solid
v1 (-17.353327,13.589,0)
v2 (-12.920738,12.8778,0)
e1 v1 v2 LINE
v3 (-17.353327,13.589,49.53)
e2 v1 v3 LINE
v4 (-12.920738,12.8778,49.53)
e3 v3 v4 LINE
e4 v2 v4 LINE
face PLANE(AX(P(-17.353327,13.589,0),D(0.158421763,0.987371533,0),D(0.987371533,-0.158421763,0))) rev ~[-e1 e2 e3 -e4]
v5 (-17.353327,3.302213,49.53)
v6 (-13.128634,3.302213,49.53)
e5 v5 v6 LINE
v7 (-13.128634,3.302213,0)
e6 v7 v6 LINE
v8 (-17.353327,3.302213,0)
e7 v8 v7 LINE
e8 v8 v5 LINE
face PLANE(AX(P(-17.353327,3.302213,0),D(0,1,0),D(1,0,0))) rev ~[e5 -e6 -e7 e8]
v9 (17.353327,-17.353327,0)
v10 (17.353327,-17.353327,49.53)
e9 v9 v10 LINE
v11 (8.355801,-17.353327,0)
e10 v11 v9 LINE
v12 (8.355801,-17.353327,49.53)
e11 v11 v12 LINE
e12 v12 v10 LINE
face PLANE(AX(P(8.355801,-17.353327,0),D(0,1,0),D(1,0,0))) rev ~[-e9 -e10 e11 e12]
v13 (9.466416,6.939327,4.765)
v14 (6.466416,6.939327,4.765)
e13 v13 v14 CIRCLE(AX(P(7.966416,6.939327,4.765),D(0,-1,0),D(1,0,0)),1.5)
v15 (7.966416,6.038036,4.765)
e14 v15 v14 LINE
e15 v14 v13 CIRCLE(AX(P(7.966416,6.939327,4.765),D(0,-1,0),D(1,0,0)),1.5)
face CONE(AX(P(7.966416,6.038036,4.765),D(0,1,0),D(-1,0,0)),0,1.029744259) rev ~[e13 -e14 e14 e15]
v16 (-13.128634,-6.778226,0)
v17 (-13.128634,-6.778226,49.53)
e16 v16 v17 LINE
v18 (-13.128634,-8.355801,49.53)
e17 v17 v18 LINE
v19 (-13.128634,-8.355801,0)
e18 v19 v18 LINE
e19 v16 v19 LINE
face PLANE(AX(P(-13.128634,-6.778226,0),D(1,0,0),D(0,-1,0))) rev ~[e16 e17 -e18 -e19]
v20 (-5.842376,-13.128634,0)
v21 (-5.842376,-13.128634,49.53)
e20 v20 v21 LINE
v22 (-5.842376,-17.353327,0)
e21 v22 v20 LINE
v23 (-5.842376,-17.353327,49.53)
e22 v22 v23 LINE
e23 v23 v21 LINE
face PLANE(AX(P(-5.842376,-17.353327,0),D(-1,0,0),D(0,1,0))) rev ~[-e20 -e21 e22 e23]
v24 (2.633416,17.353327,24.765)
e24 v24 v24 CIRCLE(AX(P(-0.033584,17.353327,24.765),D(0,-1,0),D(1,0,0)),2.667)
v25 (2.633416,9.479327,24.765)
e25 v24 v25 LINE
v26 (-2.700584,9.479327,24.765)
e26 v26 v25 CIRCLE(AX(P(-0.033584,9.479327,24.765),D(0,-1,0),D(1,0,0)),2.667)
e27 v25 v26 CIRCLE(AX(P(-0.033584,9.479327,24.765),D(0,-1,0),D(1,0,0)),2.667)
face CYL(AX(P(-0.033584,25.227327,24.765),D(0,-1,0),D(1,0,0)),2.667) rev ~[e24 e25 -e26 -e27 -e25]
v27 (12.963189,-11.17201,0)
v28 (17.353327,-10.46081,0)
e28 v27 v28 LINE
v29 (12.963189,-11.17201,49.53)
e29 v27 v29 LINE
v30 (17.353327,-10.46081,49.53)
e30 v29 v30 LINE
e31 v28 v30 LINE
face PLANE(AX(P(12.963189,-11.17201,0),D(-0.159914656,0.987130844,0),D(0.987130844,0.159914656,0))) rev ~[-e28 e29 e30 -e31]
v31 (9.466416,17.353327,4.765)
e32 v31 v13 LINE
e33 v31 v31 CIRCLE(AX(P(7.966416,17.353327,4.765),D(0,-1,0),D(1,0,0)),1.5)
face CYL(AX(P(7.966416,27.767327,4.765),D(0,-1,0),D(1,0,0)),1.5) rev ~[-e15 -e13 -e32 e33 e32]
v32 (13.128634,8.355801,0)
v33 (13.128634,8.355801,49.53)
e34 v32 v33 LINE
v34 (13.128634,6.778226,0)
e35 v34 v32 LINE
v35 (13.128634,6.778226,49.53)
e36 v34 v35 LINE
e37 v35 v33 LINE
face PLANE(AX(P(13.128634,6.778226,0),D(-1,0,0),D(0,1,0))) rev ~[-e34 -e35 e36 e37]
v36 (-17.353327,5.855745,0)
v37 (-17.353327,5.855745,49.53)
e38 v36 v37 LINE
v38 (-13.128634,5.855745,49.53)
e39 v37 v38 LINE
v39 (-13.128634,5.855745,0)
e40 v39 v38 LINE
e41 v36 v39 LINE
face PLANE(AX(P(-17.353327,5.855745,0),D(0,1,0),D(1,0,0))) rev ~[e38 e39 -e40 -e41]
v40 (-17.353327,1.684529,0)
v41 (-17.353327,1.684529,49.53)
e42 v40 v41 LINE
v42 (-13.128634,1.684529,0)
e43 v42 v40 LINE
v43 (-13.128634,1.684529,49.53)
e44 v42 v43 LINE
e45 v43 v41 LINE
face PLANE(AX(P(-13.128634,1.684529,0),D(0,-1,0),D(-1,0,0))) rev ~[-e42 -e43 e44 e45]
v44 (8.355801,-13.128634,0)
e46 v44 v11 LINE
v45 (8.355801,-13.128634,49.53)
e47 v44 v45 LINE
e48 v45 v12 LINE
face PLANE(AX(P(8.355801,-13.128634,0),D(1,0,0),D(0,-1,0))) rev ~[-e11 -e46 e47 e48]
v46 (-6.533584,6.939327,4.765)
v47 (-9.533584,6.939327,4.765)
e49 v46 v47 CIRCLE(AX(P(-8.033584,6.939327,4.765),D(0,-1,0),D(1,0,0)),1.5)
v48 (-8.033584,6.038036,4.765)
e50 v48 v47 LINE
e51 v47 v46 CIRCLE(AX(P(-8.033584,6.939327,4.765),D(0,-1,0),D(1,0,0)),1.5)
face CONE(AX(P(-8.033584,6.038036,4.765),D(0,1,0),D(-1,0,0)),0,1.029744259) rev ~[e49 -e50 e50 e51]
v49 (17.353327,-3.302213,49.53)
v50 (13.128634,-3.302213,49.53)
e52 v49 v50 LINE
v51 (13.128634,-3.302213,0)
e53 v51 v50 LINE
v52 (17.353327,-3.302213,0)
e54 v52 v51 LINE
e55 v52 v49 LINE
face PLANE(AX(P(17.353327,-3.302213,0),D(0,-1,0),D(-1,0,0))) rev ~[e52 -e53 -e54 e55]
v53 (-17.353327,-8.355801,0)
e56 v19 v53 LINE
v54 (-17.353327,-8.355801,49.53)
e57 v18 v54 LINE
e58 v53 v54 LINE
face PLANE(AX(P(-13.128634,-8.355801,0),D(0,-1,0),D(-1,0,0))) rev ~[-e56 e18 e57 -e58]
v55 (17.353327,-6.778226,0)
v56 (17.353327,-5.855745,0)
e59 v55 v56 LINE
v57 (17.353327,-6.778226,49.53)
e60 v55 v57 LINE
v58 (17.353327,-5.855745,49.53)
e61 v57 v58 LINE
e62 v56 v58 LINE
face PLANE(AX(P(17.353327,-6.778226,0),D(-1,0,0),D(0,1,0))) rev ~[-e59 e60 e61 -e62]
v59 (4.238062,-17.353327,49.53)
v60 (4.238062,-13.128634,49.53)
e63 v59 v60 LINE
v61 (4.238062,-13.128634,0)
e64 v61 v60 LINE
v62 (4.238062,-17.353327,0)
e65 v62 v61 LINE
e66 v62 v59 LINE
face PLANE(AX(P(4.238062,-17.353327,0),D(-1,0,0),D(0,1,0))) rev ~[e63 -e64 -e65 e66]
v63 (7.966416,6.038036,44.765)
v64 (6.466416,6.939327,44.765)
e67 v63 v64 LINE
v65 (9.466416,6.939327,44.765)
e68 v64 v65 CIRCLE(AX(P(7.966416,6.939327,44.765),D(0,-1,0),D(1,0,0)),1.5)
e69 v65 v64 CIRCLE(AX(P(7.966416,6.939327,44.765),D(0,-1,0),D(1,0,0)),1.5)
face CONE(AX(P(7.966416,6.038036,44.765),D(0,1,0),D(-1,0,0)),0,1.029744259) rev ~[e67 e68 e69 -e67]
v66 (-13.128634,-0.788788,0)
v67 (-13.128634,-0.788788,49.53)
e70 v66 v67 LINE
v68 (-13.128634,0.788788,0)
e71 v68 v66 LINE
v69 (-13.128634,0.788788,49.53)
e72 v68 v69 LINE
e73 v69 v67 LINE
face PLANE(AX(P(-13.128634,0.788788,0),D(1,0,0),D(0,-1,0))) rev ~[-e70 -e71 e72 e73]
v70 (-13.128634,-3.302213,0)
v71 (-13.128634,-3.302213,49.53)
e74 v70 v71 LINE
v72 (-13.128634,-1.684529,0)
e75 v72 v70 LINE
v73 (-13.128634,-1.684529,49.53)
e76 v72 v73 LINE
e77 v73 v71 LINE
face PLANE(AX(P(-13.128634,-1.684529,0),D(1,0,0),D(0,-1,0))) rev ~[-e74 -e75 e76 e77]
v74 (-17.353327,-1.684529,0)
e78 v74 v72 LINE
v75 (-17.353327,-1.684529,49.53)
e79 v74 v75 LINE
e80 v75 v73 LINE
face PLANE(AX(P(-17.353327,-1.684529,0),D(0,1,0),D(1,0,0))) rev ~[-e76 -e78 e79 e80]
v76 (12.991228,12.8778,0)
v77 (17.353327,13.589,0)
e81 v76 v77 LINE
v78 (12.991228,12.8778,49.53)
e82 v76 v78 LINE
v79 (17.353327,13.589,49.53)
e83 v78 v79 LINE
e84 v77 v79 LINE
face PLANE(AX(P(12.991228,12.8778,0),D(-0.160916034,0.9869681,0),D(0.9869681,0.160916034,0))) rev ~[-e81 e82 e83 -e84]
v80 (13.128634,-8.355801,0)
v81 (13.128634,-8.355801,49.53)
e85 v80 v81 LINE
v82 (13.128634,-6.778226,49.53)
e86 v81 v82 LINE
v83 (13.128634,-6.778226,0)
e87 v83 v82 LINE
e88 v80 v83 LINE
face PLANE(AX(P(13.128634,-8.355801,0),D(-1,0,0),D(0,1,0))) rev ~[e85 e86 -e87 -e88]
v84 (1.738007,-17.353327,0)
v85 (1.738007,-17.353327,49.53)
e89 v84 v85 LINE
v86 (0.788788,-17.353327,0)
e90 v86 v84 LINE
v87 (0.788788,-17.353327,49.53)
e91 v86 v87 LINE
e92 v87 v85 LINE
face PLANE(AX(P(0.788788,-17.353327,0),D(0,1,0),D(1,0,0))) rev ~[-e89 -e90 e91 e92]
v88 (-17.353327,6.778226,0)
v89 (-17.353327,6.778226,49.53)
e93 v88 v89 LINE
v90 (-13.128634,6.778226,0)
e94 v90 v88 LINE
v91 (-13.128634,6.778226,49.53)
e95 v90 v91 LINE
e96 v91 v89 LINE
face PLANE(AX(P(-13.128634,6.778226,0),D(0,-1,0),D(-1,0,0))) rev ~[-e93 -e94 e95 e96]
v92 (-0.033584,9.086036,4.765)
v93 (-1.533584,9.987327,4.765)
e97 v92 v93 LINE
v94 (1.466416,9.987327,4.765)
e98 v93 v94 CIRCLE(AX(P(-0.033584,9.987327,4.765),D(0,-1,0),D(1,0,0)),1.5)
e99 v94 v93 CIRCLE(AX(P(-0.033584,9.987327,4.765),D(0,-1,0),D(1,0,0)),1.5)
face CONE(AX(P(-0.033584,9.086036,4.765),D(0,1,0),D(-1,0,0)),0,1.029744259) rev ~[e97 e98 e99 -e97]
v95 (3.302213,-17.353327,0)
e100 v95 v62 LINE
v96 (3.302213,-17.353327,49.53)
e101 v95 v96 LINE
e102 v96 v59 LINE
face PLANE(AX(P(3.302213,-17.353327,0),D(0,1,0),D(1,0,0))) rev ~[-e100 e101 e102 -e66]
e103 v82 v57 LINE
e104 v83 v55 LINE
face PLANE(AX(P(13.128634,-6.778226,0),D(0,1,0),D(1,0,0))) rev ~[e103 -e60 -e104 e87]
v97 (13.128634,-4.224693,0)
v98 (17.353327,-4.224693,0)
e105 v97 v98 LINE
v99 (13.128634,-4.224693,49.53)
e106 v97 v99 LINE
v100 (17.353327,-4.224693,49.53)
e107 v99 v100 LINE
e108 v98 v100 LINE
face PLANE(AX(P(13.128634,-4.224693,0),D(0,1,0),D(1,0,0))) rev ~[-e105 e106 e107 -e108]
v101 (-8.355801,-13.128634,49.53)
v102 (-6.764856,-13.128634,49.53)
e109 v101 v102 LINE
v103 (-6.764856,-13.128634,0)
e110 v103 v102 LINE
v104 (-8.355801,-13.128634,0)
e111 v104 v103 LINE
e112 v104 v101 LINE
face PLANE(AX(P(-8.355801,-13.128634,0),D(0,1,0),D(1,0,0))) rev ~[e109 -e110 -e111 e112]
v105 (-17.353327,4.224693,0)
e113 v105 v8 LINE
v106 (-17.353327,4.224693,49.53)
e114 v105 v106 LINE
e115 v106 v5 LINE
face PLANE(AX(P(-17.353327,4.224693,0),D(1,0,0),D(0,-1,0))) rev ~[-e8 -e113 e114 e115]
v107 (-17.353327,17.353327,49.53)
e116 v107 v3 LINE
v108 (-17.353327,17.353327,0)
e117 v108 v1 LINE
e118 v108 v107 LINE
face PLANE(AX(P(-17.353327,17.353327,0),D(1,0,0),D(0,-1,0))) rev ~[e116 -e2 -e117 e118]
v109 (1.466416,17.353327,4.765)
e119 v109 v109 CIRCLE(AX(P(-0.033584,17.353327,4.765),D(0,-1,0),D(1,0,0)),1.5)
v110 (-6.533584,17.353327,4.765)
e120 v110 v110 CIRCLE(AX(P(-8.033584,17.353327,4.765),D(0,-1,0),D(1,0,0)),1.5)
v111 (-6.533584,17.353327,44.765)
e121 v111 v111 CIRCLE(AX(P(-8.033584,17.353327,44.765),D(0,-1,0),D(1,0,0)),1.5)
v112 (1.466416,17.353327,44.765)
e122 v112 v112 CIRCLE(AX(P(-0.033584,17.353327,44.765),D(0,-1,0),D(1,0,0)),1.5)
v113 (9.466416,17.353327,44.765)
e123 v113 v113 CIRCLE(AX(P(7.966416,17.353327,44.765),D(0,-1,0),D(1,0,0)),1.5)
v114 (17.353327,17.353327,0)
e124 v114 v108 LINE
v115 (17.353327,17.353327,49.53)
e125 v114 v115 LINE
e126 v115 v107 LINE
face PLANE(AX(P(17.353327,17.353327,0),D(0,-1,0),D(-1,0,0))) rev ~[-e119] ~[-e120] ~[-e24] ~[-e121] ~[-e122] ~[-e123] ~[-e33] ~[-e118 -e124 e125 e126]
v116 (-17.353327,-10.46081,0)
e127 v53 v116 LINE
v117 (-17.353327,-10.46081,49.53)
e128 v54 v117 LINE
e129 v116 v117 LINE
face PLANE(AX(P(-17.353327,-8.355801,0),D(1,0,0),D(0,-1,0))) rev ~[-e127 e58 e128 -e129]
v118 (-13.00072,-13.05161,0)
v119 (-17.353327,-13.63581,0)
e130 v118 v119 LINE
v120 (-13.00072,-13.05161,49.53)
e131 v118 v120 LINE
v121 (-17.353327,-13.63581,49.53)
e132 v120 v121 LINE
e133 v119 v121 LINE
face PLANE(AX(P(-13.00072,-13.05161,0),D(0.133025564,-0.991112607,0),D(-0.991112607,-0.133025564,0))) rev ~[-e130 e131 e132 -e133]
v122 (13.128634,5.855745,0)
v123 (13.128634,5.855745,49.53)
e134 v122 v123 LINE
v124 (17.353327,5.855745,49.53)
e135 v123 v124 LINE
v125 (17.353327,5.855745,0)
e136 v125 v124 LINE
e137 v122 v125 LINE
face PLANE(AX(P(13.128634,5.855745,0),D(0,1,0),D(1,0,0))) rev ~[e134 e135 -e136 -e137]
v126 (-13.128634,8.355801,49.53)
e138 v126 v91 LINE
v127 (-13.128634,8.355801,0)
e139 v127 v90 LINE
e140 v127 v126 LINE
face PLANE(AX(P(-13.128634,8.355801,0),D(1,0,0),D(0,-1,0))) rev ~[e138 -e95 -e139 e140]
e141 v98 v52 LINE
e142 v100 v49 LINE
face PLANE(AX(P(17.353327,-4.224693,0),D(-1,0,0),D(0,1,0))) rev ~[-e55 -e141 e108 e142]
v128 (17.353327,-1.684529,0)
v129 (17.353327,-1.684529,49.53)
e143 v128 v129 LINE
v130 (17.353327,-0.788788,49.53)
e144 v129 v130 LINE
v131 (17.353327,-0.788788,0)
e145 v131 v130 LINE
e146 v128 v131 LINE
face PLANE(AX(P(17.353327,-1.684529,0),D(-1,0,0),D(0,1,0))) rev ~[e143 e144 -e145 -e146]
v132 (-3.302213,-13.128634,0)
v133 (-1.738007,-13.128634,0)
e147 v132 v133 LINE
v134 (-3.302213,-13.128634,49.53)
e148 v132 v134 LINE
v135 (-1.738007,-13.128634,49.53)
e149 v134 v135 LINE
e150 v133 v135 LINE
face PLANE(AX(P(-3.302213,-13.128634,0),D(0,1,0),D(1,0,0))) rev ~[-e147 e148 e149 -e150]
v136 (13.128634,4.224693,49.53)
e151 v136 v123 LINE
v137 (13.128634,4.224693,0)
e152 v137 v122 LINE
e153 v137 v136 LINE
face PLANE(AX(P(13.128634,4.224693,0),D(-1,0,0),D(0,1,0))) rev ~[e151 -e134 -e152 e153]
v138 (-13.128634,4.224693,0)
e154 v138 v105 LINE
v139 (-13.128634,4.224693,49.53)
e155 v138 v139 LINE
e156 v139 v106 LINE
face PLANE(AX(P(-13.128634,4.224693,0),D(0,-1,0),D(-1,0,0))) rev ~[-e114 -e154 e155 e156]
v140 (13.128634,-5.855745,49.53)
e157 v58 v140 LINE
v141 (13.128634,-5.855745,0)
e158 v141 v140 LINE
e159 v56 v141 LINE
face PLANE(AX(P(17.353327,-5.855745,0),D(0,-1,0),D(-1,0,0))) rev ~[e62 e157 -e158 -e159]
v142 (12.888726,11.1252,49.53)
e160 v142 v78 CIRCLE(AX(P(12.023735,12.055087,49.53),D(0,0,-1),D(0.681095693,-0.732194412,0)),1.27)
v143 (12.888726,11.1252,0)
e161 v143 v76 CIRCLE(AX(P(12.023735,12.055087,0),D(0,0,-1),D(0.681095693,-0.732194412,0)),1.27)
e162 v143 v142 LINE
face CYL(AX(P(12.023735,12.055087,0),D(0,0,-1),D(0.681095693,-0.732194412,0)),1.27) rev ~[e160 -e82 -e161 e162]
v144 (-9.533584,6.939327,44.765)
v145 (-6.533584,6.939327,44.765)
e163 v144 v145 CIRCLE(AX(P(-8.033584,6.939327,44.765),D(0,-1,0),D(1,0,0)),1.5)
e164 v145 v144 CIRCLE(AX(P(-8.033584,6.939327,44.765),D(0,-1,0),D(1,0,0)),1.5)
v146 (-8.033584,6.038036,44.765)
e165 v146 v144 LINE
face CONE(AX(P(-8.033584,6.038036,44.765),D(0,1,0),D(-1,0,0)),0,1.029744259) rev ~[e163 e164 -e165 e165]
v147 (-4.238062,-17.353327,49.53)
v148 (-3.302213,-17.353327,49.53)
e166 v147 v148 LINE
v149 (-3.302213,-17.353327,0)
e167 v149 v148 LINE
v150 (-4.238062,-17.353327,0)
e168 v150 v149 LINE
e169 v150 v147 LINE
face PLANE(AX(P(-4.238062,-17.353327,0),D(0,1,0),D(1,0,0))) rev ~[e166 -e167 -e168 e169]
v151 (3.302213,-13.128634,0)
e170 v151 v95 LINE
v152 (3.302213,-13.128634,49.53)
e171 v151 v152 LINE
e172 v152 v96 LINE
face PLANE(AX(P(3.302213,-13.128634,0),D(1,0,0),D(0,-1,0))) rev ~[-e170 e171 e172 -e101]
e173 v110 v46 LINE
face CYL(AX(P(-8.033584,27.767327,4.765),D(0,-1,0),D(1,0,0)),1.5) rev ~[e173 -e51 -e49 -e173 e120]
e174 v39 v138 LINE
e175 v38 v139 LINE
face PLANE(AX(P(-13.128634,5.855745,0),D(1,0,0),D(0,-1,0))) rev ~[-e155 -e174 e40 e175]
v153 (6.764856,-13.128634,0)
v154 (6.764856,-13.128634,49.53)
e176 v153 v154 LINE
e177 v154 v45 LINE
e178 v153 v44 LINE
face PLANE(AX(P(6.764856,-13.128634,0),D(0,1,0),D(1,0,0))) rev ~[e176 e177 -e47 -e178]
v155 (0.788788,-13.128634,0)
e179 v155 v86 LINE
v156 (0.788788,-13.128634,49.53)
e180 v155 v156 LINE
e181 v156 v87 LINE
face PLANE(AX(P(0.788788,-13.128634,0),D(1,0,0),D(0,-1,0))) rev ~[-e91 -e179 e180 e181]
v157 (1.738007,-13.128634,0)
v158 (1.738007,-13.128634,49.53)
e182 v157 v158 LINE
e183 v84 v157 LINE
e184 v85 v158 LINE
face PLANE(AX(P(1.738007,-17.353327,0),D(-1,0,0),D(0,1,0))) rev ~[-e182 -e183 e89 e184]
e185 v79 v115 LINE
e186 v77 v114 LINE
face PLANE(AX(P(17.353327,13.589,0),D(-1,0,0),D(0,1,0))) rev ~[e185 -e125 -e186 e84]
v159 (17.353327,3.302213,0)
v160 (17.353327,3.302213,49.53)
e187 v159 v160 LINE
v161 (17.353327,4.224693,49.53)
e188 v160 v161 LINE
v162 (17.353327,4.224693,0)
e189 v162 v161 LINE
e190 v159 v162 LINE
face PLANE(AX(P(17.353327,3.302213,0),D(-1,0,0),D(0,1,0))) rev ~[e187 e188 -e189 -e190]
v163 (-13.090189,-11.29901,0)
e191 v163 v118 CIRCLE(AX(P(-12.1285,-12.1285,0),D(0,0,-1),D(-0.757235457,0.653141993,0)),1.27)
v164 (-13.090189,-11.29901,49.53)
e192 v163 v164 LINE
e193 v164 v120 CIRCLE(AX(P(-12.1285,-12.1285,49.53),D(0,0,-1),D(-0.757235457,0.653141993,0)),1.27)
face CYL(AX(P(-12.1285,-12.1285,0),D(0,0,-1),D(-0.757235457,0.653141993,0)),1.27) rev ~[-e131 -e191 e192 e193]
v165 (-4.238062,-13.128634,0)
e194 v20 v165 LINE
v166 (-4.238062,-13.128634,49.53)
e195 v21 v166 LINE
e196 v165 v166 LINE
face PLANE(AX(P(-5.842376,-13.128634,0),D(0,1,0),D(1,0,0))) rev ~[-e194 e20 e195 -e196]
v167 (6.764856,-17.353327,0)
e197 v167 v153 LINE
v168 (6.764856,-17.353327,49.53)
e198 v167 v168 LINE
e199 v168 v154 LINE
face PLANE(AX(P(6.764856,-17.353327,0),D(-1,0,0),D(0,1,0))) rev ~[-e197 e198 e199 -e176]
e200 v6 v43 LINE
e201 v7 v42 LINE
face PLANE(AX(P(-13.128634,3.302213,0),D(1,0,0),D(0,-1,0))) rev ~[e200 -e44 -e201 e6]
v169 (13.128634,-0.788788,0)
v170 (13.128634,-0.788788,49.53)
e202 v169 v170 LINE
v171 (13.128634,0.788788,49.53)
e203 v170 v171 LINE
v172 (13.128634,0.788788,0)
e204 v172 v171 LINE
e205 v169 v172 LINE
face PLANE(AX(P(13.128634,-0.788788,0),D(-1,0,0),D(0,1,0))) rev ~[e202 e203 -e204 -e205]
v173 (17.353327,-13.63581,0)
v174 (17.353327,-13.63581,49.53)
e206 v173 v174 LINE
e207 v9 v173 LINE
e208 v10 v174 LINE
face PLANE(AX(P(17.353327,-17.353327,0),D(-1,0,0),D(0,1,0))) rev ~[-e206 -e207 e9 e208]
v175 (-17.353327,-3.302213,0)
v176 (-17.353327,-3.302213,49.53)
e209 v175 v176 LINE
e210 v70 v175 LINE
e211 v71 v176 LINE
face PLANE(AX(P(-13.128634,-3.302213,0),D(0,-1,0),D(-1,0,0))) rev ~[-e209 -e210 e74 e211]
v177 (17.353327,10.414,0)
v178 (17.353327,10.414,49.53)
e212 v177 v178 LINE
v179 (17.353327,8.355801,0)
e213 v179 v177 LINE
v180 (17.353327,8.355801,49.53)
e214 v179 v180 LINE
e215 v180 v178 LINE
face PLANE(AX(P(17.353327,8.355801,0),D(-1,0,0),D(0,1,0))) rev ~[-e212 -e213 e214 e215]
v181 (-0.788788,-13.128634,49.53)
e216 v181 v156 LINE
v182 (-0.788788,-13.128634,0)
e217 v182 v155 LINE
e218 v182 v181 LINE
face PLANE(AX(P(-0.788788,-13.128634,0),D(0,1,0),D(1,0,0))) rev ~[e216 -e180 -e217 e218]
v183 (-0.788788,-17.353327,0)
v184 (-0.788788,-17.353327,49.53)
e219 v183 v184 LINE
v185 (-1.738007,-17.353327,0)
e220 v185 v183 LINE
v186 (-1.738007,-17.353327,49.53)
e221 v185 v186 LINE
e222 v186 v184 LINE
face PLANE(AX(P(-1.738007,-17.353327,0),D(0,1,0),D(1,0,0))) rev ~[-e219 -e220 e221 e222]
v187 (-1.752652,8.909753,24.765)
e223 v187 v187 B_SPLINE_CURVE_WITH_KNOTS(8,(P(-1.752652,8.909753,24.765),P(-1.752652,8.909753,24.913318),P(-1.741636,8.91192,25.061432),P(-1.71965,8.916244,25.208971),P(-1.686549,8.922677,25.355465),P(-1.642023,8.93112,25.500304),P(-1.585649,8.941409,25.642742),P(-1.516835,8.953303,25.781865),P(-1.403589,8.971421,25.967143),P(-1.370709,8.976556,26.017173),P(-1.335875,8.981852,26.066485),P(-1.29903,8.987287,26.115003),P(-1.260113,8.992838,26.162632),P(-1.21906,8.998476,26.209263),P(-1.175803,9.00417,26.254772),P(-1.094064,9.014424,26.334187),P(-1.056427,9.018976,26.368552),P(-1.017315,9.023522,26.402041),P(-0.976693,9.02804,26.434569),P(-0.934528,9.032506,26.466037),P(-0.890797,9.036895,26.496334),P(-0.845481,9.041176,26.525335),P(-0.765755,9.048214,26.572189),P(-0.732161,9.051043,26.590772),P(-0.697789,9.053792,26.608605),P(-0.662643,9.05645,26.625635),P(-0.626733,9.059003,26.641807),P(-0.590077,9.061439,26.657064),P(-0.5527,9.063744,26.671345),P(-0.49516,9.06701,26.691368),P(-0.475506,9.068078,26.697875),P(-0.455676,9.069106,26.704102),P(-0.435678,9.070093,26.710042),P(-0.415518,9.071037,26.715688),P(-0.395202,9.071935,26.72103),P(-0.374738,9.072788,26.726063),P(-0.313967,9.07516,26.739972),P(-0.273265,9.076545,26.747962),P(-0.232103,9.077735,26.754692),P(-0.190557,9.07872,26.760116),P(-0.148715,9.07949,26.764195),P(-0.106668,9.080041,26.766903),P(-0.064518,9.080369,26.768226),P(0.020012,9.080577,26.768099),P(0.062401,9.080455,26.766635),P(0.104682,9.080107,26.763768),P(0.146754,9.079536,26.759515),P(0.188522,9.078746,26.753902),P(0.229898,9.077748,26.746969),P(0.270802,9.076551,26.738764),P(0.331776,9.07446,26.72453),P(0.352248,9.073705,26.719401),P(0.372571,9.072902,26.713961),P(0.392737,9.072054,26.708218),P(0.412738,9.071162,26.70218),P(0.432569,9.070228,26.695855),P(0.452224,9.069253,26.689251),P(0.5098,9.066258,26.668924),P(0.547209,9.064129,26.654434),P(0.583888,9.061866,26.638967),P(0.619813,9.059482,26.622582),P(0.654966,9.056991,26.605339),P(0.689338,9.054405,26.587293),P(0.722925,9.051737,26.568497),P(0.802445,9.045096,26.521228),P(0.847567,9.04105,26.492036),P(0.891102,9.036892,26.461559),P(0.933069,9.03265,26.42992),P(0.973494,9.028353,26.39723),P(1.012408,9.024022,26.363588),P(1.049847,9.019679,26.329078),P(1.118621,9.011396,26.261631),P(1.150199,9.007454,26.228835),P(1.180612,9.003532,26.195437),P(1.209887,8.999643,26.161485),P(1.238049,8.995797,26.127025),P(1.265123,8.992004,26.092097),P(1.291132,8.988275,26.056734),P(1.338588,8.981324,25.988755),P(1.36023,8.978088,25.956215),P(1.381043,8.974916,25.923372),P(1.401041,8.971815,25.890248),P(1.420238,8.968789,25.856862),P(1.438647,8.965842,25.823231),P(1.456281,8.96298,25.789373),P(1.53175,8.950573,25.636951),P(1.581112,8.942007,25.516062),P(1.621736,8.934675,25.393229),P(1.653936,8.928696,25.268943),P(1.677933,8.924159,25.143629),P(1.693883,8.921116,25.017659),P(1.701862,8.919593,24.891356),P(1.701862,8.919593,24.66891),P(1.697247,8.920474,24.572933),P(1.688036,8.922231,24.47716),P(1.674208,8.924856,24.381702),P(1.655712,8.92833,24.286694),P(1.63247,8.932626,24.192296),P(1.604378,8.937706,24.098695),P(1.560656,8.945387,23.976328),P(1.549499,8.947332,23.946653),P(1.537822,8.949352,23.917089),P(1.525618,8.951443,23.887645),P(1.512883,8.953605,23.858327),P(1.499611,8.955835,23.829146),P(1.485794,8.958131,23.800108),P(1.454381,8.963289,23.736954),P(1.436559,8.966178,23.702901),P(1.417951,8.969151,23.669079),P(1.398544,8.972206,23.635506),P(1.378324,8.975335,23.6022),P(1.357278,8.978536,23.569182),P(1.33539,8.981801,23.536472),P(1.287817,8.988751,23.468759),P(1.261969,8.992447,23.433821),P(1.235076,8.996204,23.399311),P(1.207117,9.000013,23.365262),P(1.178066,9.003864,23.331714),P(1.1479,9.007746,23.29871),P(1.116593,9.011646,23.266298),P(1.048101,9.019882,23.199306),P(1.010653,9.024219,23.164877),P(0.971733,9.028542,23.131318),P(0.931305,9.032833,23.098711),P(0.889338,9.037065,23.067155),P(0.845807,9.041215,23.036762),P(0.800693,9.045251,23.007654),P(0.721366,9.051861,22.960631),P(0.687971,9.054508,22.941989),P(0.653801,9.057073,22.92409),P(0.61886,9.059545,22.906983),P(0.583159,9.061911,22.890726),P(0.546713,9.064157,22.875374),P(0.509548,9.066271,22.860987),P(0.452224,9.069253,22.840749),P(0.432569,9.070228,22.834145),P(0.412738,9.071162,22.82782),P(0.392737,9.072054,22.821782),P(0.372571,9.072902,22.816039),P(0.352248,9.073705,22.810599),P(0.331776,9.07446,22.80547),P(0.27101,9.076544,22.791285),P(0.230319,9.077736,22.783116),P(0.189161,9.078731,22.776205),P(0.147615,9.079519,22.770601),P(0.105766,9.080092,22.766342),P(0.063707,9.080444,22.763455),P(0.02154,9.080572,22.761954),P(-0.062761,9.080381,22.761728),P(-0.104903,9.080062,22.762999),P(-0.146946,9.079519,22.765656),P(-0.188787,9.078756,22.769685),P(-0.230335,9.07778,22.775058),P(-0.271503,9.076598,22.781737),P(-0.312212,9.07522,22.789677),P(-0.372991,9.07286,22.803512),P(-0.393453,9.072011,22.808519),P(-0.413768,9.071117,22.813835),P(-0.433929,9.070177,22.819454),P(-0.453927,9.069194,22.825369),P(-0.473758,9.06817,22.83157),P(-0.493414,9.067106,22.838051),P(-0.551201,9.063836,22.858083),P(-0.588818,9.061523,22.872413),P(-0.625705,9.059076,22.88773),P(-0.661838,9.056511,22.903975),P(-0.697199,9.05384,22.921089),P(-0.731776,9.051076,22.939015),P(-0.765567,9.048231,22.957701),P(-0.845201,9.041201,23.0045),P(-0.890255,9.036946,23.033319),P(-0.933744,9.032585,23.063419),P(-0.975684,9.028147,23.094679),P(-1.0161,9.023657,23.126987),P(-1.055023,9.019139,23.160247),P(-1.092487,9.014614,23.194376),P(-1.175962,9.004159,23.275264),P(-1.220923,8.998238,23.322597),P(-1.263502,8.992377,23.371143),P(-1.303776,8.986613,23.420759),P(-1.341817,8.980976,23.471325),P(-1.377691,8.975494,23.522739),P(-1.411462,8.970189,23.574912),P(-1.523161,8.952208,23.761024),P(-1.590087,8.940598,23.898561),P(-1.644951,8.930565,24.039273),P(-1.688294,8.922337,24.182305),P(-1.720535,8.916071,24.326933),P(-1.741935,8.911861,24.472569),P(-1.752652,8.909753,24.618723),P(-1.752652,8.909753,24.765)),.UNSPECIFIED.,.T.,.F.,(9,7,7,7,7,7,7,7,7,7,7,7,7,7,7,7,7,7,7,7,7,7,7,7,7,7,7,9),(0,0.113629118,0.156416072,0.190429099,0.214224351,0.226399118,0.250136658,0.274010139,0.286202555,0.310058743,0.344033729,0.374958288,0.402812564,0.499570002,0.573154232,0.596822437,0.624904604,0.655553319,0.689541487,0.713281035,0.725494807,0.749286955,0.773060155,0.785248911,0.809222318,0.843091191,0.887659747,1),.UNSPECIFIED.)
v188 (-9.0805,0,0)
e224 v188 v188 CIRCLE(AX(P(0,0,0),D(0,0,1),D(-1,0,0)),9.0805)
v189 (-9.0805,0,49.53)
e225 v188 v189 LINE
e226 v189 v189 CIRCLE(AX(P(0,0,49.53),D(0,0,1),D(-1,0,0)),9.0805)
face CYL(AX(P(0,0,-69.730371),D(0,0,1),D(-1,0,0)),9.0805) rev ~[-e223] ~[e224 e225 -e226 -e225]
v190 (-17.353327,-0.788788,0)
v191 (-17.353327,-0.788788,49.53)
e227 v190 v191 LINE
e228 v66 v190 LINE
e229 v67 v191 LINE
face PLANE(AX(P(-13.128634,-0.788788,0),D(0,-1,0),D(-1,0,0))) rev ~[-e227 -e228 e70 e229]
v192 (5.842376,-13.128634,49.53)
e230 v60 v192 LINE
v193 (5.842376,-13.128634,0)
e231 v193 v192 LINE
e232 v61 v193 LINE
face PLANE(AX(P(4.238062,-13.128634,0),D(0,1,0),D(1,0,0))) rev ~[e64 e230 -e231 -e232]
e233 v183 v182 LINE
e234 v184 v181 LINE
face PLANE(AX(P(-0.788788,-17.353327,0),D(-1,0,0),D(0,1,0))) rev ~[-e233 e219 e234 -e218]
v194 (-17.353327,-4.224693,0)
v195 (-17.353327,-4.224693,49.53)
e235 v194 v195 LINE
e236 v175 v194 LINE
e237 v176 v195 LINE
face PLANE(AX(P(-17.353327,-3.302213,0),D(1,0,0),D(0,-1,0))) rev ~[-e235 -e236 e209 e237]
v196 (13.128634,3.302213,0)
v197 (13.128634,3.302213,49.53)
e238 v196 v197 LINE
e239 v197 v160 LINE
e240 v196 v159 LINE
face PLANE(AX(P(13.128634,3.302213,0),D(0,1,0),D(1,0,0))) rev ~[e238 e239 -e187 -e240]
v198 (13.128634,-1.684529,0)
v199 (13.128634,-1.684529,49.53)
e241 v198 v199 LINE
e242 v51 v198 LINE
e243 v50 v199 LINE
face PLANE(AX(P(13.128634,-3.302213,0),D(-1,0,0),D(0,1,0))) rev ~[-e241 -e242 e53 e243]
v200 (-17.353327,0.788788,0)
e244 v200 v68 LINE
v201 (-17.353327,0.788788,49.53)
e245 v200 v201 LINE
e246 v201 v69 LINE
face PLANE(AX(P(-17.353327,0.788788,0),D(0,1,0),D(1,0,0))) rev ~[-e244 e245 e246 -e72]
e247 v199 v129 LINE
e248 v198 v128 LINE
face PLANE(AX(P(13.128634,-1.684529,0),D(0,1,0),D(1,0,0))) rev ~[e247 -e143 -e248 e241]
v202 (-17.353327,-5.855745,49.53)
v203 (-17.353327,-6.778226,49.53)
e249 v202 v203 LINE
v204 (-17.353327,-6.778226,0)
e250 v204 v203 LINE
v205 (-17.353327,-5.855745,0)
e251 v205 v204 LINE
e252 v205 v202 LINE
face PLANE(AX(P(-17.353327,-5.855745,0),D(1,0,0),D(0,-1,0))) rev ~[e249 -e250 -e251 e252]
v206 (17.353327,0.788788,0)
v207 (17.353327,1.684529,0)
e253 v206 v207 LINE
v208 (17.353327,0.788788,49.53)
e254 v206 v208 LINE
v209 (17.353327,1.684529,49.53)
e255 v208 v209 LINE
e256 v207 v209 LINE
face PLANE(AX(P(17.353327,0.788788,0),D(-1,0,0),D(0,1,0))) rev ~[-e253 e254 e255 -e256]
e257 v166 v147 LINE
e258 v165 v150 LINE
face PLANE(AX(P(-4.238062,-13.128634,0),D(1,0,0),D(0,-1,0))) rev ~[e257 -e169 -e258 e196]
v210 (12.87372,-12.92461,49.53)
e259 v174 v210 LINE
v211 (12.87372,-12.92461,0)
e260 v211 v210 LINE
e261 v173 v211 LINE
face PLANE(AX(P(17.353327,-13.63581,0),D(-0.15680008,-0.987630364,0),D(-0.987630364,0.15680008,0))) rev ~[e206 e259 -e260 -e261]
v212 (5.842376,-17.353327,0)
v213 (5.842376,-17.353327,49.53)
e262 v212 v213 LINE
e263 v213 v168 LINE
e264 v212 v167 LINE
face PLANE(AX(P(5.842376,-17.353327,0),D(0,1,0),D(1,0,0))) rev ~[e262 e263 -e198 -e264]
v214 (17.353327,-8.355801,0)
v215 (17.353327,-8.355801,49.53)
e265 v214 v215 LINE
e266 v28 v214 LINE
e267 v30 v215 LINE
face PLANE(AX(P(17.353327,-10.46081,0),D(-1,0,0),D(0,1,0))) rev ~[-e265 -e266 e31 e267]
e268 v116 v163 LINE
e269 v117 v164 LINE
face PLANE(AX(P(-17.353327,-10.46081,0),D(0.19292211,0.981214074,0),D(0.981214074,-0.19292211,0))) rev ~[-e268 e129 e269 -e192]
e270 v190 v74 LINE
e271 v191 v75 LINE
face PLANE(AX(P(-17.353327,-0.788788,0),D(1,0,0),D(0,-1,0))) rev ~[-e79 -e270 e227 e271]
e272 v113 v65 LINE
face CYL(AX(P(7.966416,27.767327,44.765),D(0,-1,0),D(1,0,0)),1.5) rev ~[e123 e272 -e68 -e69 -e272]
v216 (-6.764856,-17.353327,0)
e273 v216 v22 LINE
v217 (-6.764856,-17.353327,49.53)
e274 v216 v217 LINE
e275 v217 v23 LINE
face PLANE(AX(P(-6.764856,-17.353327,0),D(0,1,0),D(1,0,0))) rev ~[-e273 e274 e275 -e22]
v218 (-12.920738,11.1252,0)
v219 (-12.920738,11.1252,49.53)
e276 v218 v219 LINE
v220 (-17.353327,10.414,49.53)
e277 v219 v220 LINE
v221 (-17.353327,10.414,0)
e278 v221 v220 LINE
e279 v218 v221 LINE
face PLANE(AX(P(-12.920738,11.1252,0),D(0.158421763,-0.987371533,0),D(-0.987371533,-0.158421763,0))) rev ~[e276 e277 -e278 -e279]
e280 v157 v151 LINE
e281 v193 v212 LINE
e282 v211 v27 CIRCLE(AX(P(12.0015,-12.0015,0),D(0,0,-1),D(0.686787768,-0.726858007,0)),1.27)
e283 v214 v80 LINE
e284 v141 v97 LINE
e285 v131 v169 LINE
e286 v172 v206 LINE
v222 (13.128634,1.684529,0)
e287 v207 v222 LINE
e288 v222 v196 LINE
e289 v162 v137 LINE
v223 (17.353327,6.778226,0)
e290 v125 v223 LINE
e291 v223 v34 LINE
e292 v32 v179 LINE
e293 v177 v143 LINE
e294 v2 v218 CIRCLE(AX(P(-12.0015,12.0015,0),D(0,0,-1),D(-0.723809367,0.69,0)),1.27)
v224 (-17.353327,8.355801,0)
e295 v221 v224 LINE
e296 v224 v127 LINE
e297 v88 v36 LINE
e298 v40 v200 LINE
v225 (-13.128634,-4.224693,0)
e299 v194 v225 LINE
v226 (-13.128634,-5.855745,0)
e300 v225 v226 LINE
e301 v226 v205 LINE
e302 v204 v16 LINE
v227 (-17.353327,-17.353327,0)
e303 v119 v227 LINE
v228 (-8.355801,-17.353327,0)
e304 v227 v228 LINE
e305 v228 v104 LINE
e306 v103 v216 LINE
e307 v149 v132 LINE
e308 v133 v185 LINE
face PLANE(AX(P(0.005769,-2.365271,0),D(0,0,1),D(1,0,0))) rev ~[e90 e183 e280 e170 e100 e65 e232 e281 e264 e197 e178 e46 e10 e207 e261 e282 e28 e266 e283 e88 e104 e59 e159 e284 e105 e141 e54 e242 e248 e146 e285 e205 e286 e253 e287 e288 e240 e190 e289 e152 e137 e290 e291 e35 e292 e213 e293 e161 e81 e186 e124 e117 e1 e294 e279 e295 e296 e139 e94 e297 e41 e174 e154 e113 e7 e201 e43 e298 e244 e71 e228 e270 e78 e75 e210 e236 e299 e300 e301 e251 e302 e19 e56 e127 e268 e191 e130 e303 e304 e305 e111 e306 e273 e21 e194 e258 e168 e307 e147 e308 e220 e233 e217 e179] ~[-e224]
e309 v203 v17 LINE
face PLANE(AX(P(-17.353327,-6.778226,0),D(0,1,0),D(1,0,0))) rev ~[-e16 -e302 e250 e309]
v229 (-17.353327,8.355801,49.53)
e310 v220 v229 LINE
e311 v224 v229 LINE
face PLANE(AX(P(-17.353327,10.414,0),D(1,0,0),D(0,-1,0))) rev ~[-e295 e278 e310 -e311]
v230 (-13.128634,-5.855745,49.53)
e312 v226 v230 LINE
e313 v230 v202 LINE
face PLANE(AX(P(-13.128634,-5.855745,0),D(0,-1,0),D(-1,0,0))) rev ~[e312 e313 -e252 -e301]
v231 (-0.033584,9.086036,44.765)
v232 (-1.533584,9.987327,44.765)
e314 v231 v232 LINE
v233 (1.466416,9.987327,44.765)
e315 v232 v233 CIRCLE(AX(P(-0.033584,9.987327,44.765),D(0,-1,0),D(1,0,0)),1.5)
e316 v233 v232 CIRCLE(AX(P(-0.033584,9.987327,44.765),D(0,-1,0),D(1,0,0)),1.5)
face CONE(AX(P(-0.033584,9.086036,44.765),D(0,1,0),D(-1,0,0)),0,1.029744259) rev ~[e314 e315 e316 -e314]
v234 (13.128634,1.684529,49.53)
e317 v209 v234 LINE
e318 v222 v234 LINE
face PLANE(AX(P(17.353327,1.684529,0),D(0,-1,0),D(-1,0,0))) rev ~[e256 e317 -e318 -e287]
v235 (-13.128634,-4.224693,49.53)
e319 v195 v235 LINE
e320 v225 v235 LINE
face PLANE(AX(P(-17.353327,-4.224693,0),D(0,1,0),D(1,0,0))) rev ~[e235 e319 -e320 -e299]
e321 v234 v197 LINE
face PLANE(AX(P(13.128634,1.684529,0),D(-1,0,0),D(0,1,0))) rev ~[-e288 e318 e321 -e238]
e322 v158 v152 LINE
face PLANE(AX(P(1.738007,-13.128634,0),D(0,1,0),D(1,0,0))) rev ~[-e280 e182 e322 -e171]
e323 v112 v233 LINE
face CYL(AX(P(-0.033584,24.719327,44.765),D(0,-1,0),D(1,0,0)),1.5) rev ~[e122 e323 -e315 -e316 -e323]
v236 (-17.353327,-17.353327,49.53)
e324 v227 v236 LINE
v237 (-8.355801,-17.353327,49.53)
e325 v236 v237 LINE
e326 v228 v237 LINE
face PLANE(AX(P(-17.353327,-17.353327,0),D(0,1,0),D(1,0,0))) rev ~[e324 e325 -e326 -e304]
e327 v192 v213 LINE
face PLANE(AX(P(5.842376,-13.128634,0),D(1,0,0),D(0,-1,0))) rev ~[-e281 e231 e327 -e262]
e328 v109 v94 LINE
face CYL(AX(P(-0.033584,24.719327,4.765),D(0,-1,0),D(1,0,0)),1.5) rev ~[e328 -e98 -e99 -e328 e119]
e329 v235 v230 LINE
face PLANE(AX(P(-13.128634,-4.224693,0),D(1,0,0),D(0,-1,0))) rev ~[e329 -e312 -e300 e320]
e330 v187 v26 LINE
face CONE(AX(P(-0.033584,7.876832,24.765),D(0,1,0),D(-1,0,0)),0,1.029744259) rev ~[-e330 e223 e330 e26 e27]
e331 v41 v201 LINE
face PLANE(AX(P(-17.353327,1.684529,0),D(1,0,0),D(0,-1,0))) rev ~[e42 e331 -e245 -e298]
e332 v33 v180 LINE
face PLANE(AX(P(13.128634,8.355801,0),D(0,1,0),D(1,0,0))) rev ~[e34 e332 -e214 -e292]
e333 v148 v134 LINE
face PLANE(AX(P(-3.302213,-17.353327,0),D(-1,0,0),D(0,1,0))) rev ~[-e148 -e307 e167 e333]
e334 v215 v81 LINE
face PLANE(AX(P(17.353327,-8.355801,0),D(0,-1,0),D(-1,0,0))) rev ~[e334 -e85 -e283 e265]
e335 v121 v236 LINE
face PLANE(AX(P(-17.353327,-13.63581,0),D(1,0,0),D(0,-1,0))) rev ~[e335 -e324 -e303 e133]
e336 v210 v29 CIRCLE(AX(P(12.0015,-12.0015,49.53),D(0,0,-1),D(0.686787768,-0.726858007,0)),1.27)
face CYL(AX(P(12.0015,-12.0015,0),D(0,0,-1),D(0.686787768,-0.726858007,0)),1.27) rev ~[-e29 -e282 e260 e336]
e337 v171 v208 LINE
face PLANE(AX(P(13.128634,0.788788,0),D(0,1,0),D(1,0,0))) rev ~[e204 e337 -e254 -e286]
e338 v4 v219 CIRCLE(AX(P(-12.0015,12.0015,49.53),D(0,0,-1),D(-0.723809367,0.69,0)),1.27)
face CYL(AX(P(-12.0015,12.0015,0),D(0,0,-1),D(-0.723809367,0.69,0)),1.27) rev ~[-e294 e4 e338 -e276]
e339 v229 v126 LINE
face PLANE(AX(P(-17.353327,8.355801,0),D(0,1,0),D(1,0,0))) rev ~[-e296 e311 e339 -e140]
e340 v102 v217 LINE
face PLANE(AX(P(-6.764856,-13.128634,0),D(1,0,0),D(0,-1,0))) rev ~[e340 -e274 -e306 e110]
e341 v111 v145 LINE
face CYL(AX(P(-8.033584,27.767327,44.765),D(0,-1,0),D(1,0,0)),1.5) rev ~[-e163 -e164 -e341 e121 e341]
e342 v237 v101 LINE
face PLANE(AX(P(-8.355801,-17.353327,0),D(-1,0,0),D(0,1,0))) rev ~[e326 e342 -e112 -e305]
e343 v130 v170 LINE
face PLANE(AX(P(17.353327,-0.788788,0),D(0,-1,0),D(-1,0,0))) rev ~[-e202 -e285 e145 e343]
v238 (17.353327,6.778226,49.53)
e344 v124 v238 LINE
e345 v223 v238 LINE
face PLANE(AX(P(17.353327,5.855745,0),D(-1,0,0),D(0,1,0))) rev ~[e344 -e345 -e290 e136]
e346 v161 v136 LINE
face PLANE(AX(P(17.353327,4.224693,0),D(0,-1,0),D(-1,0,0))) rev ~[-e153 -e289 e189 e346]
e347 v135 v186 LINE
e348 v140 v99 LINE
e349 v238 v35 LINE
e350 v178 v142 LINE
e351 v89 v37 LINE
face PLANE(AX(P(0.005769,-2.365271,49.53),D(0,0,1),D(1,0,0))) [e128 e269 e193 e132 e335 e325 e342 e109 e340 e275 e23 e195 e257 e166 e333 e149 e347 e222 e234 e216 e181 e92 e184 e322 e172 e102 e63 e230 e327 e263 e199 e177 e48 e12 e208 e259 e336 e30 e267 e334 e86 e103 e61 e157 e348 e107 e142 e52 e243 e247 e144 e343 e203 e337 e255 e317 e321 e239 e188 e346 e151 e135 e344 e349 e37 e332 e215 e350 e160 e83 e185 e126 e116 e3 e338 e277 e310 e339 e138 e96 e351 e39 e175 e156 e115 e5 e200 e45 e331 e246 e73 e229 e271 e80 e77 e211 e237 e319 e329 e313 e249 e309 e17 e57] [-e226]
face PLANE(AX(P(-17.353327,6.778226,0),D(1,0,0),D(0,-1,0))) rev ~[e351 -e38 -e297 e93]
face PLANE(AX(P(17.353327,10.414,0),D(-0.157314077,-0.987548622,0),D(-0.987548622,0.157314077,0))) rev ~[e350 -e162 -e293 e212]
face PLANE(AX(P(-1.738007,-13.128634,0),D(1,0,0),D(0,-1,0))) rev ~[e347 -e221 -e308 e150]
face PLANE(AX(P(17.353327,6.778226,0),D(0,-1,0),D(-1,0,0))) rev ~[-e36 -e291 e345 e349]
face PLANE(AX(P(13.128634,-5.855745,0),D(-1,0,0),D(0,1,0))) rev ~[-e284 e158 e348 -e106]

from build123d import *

# Parameters (mm, degrees)
F1_DEPTH = 49.53
F2_D     = 18.161
F4_D     = 3
F4_DEPTH = 7.366
F4_TIP   = 0.9012909285
F5_D     = 3
F5_DEPTH = 10.414
F5_TIP   = 0.9012909285
F6_D     = 5.334
F6_DEPTH = 7.874
F6_TIP   = 1.6024952709


# Not quite as in the source:
# - a feature of the source that left no trace in its solid (it failed there, or was rolled back) is left out


with BuildPart() as f1:
    # F0 (on Top) → F1 (new body)
    with BuildSketch(Plane.XY):
        with BuildLine():
            Line((-17.3533273419, -13.6358096689), (-17.3533273419, -17.3533273419))
            Line((-17.3533273419, -17.3533273419), (-8.3558009158, -17.3533273419))
            Line((-8.3558009158, -17.3533273419), (-8.3558009158, -13.1286343989))
            Line((-8.3558009158, -13.1286343989), (-6.7648564214, -13.1286343989))
            Line((-6.7648564214, -13.1286343989), (-6.7648564214, -17.3533273419))
            Line((-6.7648564214, -17.3533273419), (-5.8423760003, -17.3533273419))
            Line((-5.8423760003, -17.3533273419), (-5.8423760003, -13.1286343989))
            Line((-5.8423760003, -13.1286343989), (-4.2380622245, -13.1286343989))
            Line((-4.2380622245, -13.1286343989), (-4.2380622245, -17.3533273419))
            Line((-4.2380622245, -17.3533273419), (-3.3022125219, -17.3533273419))
            Line((-3.3022125219, -17.3533273419), (-3.3022125219, -13.1286343989))
            Line((-3.3022125219, -13.1286343989), (-1.7380065905, -13.1286343989))
            Line((-1.7380065905, -13.1286343989), (-1.7380065905, -17.3533273419))
            Line((-1.7380065905, -17.3533273419), (-0.7887876064, -17.3533273419))
            Line((-0.7887876064, -17.3533273419), (-0.7887876064, -13.1286343989))
            Line((-0.7887876064, -13.1286343989), (0.7887876064, -13.1286343989))
            Line((0.7887876064, -13.1286343989), (0.7887876064, -17.3533273419))
            Line((0.7887876064, -17.3533273419), (1.7380065905, -17.3533273419))
            Line((1.7380065905, -17.3533273419), (1.7380065905, -13.1286343989))
            Line((1.7380065905, -13.1286343989), (3.3022125219, -13.1286343989))
            Line((3.3022125219, -13.1286343989), (3.3022125219, -17.3533273419))
            Line((3.3022125219, -17.3533273419), (4.2380622245, -17.3533273419))
            Line((4.2380622245, -17.3533273419), (4.2380622245, -13.1286343989))
            Line((4.2380622245, -13.1286343989), (5.8423760003, -13.1286343989))
            Line((5.8423760003, -13.1286343989), (5.8423760003, -17.3533273419))
            Line((5.8423760003, -17.3533273419), (6.7648564214, -17.3533273419))
            Line((6.7648564214, -17.3533273419), (6.7648564214, -13.1286343989))
            Line((6.7648564214, -13.1286343989), (8.3558009158, -13.1286343989))
            Line((8.3558009158, -13.1286343989), (8.3558009158, -17.3533273419))
            Line((8.3558009158, -17.3533273419), (17.3533273419, -17.3533273419))
            Line((17.3533273419, -17.3533273419), (17.3533273419, -13.6358096689))
            Line((17.3533273419, -13.6358096689), (12.8737204648, -12.9246096689))
            ThreePointArc((12.8737204648, -12.9246096689), (10.7331515862, -11.9367520182), (12.9631890301, -11.1720096689))
            Line((12.9631890301, -11.1720096689), (17.3533273419, -10.4608096689))
            Line((17.3533273419, -10.4608096689), (17.3533273419, -8.3558009158))
            Line((17.3533273419, -8.3558009158), (13.1286343989, -8.3558009158))
            Line((13.1286343989, -8.3558009158), (13.1286343989, -6.7782257029))
            Line((13.1286343989, -6.7782257029), (17.3533273419, -6.7782257029))
            Line((17.3533273419, -6.7782257029), (17.3533273419, -5.8557452818))
            Line((17.3533273419, -5.8557452818), (13.1286343989, -5.8557452818))
            Line((13.1286343989, -5.8557452818), (13.1286343989, -4.224692943))
            Line((13.1286343989, -4.224692943), (17.3533273419, -4.224692943))
            Line((17.3533273419, -4.224692943), (17.3533273419, -3.3022125219))
            Line((17.3533273419, -3.3022125219), (13.1286343989, -3.3022125219))
            Line((13.1286343989, -3.3022125219), (13.1286343989, -1.6845294646))
            Line((13.1286343989, -1.6845294646), (17.3533273419, -1.6845294646))
            Line((17.3533273419, -1.6845294646), (17.3533273419, -0.7887876064))
            Line((17.3533273419, -0.7887876064), (13.1286343989, -0.7887876064))
            Line((13.1286343989, -0.7887876064), (13.1286343989, 0.7887876064))
            Line((13.1286343989, 0.7887876064), (17.3533273419, 0.7887876064))
            Line((17.3533273419, 0.7887876064), (17.3533273419, 1.6845294646))
            Line((17.3533273419, 1.6845294646), (13.1286343989, 1.6845294646))
            Line((13.1286343989, 1.6845294646), (13.1286343989, 3.3022125219))
            Line((13.1286343989, 3.3022125219), (17.3533273419, 3.3022125219))
            Line((17.3533273419, 3.3022125219), (17.3533273419, 4.224692943))
            Line((17.3533273419, 4.224692943), (13.1286343989, 4.224692943))
            Line((13.1286343989, 4.224692943), (13.1286343989, 5.8557452818))
            Line((13.1286343989, 5.8557452818), (17.3533273419, 5.8557452818))
            Line((17.3533273419, 5.8557452818), (17.3533273419, 6.7782257029))
            Line((17.3533273419, 6.7782257029), (13.1286343989, 6.7782257029))
            Line((13.1286343989, 6.7782257029), (13.1286343989, 8.3558009158))
            Line((13.1286343989, 8.3558009158), (17.3533273419, 8.3558009158))
            Line((17.3533273419, 8.3558009158), (17.3533273419, 10.414))
            Line((17.3533273419, 10.414), (12.8887263902, 11.1252))
            ThreePointArc((12.8887263902, 11.1252), (10.7559013561, 12.1292367927), (12.9912280955, 12.8778))
            Line((12.9912280955, 12.8778), (17.3533273419, 13.589))
            Line((17.3533273419, 13.589), (17.3533273419, 17.3533273419))
            Line((17.3533273419, 17.3533273419), (-17.3533273419, 17.3533273419))
            Line((-17.3533273419, 17.3533273419), (-17.3533273419, 13.589))
            Line((-17.3533273419, 13.589), (-12.9207378963, 12.8778))
            ThreePointArc((-12.9207378963, 12.8778), (-10.7315, 12.0015), (-12.9207378963, 11.1252))
            Line((-12.9207378963, 11.1252), (-17.3533273419, 10.414))
            Line((-17.3533273419, 10.414), (-17.3533273419, 8.3558009158))
            Line((-17.3533273419, 8.3558009158), (-13.1286343989, 8.3558009158))
            Line((-13.1286343989, 8.3558009158), (-13.1286343989, 6.7782257029))
            Line((-13.1286343989, 6.7782257029), (-17.3533273419, 6.7782257029))
            Line((-17.3533273419, 6.7782257029), (-17.3533273419, 5.8557452818))
            Line((-17.3533273419, 5.8557452818), (-13.1286343989, 5.8557452818))
            Line((-13.1286343989, 5.8557452818), (-13.1286343989, 4.224692943))
            Line((-13.1286343989, 4.224692943), (-17.3533273419, 4.224692943))
            Line((-17.3533273419, 4.224692943), (-17.3533273419, 3.3022125219))
            Line((-17.3533273419, 3.3022125219), (-13.1286343989, 3.3022125219))
            Line((-13.1286343989, 3.3022125219), (-13.1286343989, 1.6845294646))
            Line((-13.1286343989, 1.6845294646), (-17.3533273419, 1.6845294646))
            Line((-17.3533273419, 1.6845294646), (-17.3533273419, 0.7887876064))
            Line((-17.3533273419, 0.7887876064), (-13.1286343989, 0.7887876064))
            Line((-13.1286343989, 0.7887876064), (-13.1286343989, -0.7887876064))
            Line((-13.1286343989, -0.7887876064), (-17.3533273419, -0.7887876064))
            Line((-17.3533273419, -0.7887876064), (-17.3533273419, -1.6845294646))
            Line((-17.3533273419, -1.6845294646), (-13.1286343989, -1.6845294646))
            Line((-13.1286343989, -1.6845294646), (-13.1286343989, -3.3022125219))
            Line((-13.1286343989, -3.3022125219), (-17.3533273419, -3.3022125219))
            Line((-17.3533273419, -3.3022125219), (-17.3533273419, -4.224692943))
            Line((-17.3533273419, -4.224692943), (-13.1286343989, -4.224692943))
            Line((-13.1286343989, -4.224692943), (-13.1286343989, -5.8557452818))
            Line((-13.1286343989, -5.8557452818), (-17.3533273419, -5.8557452818))
            Line((-17.3533273419, -5.8557452818), (-17.3533273419, -6.7782257029))
            Line((-17.3533273419, -6.7782257029), (-13.1286343989, -6.7782257029))
            Line((-13.1286343989, -6.7782257029), (-13.1286343989, -8.3558009158))
            Line((-13.1286343989, -8.3558009158), (-17.3533273419, -8.3558009158))
            Line((-17.3533273419, -8.3558009158), (-17.3533273419, -10.4608096689))
            Line((-17.3533273419, -10.4608096689), (-13.0901890301, -11.2990096689))
            ThreePointArc((-13.0901890301, -11.2990096689), (-10.8601515862, -12.0637520182), (-13.0007204648, -13.0516096689))
            Line((-13.0007204648, -13.0516096689), (-17.3533273419, -13.6358096689))
        make_face()
    extrude(amount=F1_DEPTH)

    # F2 (through all)
    with Locations(Plane(origin=(0, 0, 0), x_dir=(1, 0, 0), z_dir=(0, 0, -1))):
        with Locations((0, 0)):
            Hole(F2_D / 2)

    # F4
    with Locations(Plane(origin=(0, 17.3533273419, 0), x_dir=(-1, 0, 0), z_dir=(0, 1, 0))):
        with Locations((0.033583874, 44.765), (0.033583874, 4.765)):
            Hole(F4_D / 2, depth=F4_DEPTH)
            with Locations((0, 0, -(F4_DEPTH + F4_TIP / 2))):  # 118° drill point
                Cone(0, F4_D / 2, F4_TIP, mode=Mode.SUBTRACT)

    # F5
    with Locations(Plane(origin=(0, 17.3533273419, 0), x_dir=(-1, 0, 0), z_dir=(0, 1, 0))):
        with Locations((8.033583874, 44.765), (8.033583874, 4.765), (-7.966416126, 4.765), (-7.966416126, 44.765)):
            Hole(F5_D / 2, depth=F5_DEPTH)
            with Locations((0, 0, -(F5_DEPTH + F5_TIP / 2))):  # 118° drill point
                Cone(0, F5_D / 2, F5_TIP, mode=Mode.SUBTRACT)

    # F6
    with Locations(Plane(origin=(0, 17.3533273419, 0), x_dir=(-1, 0, 0), z_dir=(0, 1, 0))):
        with Locations((0.033583874, 24.765)):
            Hole(F6_D / 2, depth=F6_DEPTH)
            with Locations((0, 0, -(F6_DEPTH + F6_TIP / 2))):  # 118° drill point
                Cone(0, F6_D / 2, F6_TIP, mode=Mode.SUBTRACT)


solid = f1.part
